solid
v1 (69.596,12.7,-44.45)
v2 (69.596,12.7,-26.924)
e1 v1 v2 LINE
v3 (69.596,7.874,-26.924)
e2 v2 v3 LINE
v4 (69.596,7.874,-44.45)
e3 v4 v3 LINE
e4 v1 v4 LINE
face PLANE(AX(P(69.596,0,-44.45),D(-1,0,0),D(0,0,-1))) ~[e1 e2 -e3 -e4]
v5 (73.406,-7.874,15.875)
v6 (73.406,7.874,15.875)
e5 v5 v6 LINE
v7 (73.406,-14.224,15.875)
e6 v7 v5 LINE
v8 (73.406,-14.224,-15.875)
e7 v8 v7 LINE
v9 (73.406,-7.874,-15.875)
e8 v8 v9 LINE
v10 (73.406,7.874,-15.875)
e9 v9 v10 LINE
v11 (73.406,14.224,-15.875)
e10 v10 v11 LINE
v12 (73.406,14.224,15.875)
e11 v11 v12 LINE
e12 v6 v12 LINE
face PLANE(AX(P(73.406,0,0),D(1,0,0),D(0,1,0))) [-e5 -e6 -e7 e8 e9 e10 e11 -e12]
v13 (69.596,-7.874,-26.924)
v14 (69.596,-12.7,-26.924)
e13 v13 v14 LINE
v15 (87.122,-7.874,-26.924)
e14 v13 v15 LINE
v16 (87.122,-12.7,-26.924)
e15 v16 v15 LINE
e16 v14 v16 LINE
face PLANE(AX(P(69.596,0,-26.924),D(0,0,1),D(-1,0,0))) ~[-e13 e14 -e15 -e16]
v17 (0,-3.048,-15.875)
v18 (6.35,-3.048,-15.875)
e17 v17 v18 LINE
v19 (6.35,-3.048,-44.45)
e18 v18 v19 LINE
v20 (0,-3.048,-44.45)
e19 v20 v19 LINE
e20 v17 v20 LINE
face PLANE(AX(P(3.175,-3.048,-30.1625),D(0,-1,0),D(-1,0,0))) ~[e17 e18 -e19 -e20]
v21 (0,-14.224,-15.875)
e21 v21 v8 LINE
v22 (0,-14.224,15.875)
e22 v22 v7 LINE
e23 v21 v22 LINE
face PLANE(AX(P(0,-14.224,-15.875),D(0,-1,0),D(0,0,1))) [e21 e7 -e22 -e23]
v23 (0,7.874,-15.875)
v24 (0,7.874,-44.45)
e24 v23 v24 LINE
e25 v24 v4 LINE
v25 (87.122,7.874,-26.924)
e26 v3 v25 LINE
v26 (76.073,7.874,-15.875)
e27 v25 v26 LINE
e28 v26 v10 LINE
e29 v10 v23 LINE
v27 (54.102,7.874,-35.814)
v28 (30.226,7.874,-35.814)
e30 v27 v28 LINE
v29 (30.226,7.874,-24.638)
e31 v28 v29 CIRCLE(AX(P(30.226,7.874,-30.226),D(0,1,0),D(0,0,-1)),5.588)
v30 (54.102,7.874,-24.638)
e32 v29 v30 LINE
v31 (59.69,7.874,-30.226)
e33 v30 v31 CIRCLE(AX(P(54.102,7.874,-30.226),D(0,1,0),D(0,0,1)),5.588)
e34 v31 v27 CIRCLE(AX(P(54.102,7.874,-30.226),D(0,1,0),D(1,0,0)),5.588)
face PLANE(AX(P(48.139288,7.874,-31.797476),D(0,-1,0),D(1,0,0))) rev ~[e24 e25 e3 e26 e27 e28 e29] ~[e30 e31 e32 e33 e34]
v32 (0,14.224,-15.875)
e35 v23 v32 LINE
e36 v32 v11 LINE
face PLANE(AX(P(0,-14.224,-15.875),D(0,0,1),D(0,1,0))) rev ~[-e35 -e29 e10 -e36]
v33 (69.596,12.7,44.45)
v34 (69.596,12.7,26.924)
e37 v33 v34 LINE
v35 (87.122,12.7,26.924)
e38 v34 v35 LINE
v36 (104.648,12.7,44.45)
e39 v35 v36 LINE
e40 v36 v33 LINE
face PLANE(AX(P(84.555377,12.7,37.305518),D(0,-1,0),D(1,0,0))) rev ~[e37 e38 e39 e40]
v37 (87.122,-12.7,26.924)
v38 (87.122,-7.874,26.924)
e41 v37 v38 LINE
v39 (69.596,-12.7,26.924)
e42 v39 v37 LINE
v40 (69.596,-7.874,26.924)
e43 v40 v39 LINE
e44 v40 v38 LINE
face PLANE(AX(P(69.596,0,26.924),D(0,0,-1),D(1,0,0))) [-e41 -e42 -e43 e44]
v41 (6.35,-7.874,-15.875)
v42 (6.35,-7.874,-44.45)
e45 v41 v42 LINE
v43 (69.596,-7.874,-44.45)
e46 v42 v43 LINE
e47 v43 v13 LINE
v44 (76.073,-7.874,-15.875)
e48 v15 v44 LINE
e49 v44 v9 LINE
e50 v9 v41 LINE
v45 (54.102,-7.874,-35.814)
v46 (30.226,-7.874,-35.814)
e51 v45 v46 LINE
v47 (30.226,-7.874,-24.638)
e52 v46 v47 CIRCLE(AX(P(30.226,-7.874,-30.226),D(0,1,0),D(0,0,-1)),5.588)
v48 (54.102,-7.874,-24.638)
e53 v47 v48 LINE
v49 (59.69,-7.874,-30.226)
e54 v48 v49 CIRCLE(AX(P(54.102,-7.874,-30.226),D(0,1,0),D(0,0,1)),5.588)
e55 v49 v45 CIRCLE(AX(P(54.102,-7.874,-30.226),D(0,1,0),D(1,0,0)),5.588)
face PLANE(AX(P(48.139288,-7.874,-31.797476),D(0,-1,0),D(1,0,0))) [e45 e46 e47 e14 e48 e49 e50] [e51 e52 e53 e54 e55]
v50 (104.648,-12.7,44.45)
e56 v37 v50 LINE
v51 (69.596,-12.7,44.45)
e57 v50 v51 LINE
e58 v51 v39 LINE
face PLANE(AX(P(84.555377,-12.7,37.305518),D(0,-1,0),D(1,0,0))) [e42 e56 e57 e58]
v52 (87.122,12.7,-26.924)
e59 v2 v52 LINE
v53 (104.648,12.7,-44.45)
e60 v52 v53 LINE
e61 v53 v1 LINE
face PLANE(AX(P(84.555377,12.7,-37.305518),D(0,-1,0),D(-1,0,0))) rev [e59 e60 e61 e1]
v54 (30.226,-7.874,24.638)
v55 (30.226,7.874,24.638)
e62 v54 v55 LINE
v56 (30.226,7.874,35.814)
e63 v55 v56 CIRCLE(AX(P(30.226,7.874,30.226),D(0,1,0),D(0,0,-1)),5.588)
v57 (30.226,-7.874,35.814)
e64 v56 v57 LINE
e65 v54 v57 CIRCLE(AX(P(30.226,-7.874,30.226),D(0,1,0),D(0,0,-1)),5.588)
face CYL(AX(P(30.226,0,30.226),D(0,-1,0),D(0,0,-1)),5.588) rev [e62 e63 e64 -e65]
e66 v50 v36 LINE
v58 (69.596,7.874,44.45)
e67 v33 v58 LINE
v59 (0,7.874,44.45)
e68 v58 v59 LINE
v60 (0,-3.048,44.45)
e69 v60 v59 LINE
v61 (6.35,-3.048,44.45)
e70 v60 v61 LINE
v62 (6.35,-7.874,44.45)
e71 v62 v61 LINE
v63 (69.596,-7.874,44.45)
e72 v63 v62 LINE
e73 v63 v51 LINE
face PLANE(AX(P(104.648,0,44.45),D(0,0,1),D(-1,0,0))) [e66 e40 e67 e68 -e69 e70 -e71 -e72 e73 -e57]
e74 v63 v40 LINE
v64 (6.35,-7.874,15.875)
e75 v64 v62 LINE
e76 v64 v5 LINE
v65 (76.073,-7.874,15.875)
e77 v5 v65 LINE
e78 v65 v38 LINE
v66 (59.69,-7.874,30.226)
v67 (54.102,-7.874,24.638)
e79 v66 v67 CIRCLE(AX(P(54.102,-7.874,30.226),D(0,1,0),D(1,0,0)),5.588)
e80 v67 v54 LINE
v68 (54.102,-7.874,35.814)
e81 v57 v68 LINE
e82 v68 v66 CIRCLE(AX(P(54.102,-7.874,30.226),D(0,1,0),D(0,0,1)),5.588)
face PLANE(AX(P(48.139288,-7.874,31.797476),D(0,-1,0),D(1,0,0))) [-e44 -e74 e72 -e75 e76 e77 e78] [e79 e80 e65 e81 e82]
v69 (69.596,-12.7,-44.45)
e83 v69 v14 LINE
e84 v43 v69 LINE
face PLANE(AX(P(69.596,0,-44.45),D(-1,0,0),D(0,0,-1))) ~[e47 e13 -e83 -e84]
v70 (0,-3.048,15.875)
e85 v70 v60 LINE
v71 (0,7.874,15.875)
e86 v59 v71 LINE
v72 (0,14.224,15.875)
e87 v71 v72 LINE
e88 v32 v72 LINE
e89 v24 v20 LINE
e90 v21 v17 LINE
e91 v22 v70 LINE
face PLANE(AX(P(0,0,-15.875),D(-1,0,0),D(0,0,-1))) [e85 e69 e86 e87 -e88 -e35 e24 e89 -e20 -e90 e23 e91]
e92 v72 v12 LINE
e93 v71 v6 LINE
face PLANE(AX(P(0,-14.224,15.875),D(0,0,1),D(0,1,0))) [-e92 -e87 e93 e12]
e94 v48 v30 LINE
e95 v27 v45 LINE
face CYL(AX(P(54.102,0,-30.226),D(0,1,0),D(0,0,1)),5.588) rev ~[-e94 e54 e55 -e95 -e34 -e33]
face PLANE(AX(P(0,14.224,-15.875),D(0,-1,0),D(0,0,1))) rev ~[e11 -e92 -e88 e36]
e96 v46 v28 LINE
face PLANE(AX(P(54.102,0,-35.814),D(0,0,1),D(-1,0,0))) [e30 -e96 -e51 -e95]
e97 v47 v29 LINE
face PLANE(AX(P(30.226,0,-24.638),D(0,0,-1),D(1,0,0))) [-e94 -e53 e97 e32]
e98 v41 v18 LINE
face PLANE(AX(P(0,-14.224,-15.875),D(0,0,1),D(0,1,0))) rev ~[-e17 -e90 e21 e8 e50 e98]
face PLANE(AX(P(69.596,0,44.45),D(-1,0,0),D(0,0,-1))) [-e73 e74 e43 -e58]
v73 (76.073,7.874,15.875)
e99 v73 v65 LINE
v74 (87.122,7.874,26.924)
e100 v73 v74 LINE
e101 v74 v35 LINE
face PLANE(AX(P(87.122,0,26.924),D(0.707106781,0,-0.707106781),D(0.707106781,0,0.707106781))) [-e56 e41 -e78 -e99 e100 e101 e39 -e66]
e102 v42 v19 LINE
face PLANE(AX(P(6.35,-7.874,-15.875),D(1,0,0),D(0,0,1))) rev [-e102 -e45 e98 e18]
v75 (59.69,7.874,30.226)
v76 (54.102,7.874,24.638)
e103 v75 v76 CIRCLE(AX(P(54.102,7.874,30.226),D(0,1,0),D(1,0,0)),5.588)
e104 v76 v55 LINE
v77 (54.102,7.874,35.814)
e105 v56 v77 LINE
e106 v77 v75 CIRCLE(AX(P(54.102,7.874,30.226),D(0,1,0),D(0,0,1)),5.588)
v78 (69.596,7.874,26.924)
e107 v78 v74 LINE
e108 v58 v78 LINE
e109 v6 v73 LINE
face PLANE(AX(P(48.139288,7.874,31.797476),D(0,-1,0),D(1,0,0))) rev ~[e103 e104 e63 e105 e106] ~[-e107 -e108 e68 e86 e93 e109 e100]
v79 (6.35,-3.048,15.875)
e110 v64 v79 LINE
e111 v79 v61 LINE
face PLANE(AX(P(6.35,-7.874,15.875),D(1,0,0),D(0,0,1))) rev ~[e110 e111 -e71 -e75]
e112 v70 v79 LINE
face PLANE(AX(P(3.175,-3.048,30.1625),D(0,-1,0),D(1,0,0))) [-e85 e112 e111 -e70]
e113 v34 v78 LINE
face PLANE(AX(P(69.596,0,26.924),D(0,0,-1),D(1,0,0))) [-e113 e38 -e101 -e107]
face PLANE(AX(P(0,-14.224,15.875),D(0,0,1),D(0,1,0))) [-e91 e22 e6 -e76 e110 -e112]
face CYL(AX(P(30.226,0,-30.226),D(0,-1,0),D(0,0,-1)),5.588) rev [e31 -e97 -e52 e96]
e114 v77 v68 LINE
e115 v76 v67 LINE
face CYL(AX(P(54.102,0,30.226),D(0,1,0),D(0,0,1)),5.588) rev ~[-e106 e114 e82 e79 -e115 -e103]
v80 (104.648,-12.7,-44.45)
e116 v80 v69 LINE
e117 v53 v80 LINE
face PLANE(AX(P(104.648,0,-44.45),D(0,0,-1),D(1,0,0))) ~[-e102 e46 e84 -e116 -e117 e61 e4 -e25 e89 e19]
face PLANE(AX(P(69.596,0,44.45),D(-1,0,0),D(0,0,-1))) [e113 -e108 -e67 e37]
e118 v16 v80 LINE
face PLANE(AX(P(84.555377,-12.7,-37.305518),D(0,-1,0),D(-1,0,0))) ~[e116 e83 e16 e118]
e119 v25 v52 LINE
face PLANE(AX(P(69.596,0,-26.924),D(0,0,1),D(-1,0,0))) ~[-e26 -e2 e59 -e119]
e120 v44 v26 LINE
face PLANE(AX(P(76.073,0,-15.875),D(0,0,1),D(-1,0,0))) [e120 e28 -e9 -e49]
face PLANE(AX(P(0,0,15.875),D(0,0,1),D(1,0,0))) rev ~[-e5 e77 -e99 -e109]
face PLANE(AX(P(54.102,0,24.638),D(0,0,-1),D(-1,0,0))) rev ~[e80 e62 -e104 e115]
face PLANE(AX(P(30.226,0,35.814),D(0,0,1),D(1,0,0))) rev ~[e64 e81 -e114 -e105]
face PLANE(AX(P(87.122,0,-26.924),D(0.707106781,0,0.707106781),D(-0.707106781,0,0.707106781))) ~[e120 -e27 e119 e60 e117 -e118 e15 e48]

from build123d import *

# Parameters (mm, degrees)
F0_W     = 28.448
F0_H     = 31.75
F1_DEPTH = 73.406
F3_DEPTH = 7.874
F4_W     = 6.35
F4_H     = 28.575
F5_DEPTH = 4.826
F7_DEPTH = 12.7


# Not quite as in the source:
# - a pattern or mirror of a feature is missing from the dataset's text; its kind, count and spacing are read off the source's solid


with BuildPart() as f1:
    # F0 (on Right) → F1 (new body)
    with BuildSketch(Plane.YZ):
        Rectangle(F0_W, F0_H)
    extrude(amount=F1_DEPTH)

    # F2 (on Front) → F3 (join, symmetric)
    with BuildSketch(Plane.XZ):
        Polygon((0, 15.875), (76.073, 15.875), (104.648, 44.45), (0, 44.45), align=None)
        with BuildLine():
            ThreePointArc((30.226, 24.638), (24.638, 30.226), (30.226, 35.814))
            Line((30.226, 35.814), (54.102, 35.814))
            ThreePointArc((54.102, 35.814), (58.0533126933, 34.1773126933), (59.69, 30.226))
            ThreePointArc((59.69, 30.226), (58.0533126933, 26.2746873067), (54.102, 24.638))
            Line((54.102, 24.638), (30.226, 24.638))
        make_face(mode=Mode.SUBTRACT)
        Polygon((76.073, -15.875), (0, -15.875), (0, -44.45), (104.648, -44.45), align=None)
        with BuildLine():
            ThreePointArc((54.102, -24.638), (58.0533126933, -26.2746873067), (59.69, -30.226))
            ThreePointArc((59.69, -30.226), (58.0533126933, -34.1773126933), (54.102, -35.814))
            Line((54.102, -35.814), (30.226, -35.814))
            ThreePointArc((30.226, -35.814), (24.638, -30.226), (30.226, -24.638))
            Line((30.226, -24.638), (54.102, -24.638))
        make_face(mode=Mode.SUBTRACT)
    extrude(amount=F3_DEPTH, both=True)

    # F4 (on face) → F5 (cut)
    with BuildSketch(Plane.XZ.offset(7.874)):
        with Locations((3.175, 30.1625)):
            Rectangle(F4_W, F4_H)
    f5 = extrude(amount=-F5_DEPTH, mode=Mode.SUBTRACT)

    # F5_copies: F5 across plane
    add(f5.mirror(Plane(origin=(0, 0, 0), x_dir=(-1, 0, 0), z_dir=(0, 0, -1))), mode=Mode.SUBTRACT)

    # F6 (on Front) → F7 (join, symmetric)
    with BuildSketch(Plane.XZ):
        Polygon((104.648, 44.45), (69.596, 44.45), (69.596, 26.924), (87.122, 26.924), align=None)
    f7 = extrude(amount=F7_DEPTH, both=True)

    # F7_copies: F7 across plane
    add(f7.mirror(Plane(origin=(0, 0, 0), x_dir=(-1, 0, 0), z_dir=(0, 0, -1))))


solid = f1.part
